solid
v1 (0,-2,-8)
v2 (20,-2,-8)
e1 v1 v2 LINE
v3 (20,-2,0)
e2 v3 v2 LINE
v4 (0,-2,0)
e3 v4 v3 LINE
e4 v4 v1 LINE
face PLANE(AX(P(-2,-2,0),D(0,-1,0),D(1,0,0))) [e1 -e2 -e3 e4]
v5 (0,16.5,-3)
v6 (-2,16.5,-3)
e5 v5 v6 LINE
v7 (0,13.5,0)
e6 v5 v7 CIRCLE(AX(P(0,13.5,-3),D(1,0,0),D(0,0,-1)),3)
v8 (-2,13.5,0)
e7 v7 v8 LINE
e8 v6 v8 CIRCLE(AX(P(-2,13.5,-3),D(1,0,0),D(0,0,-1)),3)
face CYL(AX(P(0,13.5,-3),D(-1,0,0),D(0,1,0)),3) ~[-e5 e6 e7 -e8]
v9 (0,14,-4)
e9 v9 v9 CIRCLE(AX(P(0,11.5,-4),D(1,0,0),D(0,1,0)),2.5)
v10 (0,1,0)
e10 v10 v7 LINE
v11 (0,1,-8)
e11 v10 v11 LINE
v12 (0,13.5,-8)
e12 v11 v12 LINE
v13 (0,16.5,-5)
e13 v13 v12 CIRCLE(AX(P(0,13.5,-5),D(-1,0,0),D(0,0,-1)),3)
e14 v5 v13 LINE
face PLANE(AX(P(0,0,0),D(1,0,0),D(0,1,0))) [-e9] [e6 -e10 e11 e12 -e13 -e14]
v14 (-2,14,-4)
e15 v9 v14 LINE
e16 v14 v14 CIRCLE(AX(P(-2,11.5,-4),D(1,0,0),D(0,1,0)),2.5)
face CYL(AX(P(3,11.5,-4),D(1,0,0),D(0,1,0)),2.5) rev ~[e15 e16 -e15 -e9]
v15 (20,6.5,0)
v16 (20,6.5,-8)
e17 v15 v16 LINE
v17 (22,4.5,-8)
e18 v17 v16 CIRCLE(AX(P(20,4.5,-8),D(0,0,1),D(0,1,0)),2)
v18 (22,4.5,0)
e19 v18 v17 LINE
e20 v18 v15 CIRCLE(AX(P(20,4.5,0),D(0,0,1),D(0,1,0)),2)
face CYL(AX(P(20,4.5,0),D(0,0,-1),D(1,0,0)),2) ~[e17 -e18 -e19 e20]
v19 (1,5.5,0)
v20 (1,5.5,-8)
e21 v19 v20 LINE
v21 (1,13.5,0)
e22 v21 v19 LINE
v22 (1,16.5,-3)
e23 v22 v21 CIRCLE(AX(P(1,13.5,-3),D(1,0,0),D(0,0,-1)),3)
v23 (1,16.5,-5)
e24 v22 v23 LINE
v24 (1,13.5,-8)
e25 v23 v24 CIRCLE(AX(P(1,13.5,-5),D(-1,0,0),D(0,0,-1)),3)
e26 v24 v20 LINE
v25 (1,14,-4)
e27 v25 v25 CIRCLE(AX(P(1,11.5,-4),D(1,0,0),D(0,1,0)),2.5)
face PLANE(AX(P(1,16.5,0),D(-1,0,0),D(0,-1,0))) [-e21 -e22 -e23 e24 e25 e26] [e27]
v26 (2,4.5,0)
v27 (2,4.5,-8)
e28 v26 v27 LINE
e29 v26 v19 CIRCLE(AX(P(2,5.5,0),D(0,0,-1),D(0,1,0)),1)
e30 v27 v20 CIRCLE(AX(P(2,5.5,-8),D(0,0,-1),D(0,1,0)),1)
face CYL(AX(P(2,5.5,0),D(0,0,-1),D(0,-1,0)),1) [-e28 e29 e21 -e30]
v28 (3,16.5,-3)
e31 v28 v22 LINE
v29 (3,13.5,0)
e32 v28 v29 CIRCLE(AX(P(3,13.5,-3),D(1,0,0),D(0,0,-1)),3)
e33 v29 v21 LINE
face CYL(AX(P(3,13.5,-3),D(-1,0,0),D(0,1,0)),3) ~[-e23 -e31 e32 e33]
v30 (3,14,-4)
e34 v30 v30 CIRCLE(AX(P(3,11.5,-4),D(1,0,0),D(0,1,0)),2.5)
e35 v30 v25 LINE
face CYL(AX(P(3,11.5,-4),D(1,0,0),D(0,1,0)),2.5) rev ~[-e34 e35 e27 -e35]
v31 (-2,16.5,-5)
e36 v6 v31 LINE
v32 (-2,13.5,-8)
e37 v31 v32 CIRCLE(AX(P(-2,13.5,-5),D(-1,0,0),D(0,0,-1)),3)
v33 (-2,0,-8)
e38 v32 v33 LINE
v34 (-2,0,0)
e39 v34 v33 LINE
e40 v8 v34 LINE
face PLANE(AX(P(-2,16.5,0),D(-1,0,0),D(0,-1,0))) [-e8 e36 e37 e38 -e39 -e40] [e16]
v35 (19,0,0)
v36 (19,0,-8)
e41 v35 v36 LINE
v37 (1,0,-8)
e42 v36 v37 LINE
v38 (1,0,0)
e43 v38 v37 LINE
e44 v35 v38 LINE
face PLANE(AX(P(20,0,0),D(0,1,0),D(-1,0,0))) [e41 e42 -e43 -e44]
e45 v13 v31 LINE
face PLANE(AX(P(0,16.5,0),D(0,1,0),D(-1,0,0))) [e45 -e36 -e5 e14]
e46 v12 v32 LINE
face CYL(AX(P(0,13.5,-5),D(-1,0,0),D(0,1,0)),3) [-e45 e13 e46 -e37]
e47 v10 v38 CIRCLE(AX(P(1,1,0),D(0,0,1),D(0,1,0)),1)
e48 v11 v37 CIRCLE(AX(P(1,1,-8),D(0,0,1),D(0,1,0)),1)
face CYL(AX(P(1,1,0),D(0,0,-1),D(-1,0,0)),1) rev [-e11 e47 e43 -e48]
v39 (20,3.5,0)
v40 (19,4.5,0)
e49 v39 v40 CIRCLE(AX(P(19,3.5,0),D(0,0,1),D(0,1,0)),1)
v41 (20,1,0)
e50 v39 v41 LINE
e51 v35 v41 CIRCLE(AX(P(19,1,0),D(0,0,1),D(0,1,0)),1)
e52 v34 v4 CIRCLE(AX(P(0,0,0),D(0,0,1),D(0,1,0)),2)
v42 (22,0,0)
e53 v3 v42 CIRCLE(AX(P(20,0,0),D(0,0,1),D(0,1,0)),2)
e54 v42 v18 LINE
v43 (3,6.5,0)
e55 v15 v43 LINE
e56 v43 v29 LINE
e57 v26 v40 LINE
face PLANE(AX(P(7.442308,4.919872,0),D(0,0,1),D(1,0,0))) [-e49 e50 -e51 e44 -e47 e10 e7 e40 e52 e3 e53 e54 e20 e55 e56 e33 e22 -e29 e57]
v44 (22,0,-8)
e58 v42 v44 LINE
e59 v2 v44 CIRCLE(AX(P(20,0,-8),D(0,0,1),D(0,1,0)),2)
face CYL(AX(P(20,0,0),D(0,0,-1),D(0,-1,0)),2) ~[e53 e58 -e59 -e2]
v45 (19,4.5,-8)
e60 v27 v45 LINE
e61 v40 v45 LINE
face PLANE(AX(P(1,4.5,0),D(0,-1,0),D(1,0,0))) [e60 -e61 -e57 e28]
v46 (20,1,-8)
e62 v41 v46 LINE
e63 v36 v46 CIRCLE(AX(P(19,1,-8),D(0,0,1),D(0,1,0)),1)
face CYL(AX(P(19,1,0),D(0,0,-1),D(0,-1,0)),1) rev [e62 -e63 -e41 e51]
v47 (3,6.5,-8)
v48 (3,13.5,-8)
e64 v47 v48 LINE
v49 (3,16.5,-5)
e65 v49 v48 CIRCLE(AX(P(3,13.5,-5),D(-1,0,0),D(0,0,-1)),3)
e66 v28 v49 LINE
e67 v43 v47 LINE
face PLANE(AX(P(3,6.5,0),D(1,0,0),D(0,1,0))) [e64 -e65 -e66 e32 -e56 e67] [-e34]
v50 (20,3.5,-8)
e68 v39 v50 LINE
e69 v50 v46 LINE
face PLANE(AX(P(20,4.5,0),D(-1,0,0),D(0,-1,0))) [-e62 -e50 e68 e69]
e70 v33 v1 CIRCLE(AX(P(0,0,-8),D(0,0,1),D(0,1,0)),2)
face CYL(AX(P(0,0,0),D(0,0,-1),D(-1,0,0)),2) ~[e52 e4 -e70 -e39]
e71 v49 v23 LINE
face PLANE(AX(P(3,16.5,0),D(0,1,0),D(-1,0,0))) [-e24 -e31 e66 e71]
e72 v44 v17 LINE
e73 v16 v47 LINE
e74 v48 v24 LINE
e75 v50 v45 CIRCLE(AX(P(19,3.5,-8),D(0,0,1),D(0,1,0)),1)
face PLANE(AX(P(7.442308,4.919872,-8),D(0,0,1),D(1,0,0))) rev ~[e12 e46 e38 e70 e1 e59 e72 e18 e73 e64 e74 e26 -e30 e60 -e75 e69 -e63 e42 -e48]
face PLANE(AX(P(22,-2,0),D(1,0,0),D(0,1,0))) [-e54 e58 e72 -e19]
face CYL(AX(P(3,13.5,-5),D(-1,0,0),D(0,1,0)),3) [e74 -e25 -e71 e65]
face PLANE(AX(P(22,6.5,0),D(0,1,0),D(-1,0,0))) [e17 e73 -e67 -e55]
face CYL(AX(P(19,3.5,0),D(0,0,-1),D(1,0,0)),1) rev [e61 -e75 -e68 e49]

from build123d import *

# Parameters (mm, degrees)
F1_DEPTH = 8
F3_R     = 3
F2_R     = 2.5
F4_DEPTH = 5.001
F5_R     = 2
F6_R     = 1


# Not quite as in the source:
# - a feature names something its author has since deleted; it is built from what else it names


with BuildPart() as f1:
    # F0 (on Top) → F1 (new body)
    with BuildSketch(Plane.XY):
        Polygon((0, 0), (0, 16.5), (-2, 16.5), (-2, -2), (22, -2), (22, 6.5), (3, 6.5), (3, 16.5), (1, 16.5), (1, 4.5), (20, 4.5), (20, 0), align=None)
    extrude(amount=-F1_DEPTH)

    # F3
    f3_edges = [f1.edges().sort_by_distance(p)[0] for p in [
        (-1, 16.5, 0),
        (-1, 16.5, -8),
        (2, 16.5, 0),
        (2, 16.5, -8),
    ]]
    fillet(f3_edges, radius=F3_R)

    # F2 (on face) → F4 (cut, through all)
    with BuildSketch(Plane.YZ.offset(3)):
        with Locations((11.5, -4)):
            Circle(F2_R)
    extrude(amount=-F4_DEPTH, mode=Mode.SUBTRACT)

    # F5
    f5_edges = [f1.edges().sort_by_distance(p)[0] for p in [
        (22, 6.5, -4),
        (22, -2, -4),
        (-2, -2, -4),
    ]]
    fillet(f5_edges, radius=F5_R)

    # F6
    f6_edges = [f1.edges().sort_by_distance(p)[0] for p in [
        (20, 4.5, -4),
        (20, 0, -4),
        (0, 0, -4),
        (1, 4.5, -4),
    ]]
    fillet(f6_edges, radius=F6_R)


solid = f1.part
